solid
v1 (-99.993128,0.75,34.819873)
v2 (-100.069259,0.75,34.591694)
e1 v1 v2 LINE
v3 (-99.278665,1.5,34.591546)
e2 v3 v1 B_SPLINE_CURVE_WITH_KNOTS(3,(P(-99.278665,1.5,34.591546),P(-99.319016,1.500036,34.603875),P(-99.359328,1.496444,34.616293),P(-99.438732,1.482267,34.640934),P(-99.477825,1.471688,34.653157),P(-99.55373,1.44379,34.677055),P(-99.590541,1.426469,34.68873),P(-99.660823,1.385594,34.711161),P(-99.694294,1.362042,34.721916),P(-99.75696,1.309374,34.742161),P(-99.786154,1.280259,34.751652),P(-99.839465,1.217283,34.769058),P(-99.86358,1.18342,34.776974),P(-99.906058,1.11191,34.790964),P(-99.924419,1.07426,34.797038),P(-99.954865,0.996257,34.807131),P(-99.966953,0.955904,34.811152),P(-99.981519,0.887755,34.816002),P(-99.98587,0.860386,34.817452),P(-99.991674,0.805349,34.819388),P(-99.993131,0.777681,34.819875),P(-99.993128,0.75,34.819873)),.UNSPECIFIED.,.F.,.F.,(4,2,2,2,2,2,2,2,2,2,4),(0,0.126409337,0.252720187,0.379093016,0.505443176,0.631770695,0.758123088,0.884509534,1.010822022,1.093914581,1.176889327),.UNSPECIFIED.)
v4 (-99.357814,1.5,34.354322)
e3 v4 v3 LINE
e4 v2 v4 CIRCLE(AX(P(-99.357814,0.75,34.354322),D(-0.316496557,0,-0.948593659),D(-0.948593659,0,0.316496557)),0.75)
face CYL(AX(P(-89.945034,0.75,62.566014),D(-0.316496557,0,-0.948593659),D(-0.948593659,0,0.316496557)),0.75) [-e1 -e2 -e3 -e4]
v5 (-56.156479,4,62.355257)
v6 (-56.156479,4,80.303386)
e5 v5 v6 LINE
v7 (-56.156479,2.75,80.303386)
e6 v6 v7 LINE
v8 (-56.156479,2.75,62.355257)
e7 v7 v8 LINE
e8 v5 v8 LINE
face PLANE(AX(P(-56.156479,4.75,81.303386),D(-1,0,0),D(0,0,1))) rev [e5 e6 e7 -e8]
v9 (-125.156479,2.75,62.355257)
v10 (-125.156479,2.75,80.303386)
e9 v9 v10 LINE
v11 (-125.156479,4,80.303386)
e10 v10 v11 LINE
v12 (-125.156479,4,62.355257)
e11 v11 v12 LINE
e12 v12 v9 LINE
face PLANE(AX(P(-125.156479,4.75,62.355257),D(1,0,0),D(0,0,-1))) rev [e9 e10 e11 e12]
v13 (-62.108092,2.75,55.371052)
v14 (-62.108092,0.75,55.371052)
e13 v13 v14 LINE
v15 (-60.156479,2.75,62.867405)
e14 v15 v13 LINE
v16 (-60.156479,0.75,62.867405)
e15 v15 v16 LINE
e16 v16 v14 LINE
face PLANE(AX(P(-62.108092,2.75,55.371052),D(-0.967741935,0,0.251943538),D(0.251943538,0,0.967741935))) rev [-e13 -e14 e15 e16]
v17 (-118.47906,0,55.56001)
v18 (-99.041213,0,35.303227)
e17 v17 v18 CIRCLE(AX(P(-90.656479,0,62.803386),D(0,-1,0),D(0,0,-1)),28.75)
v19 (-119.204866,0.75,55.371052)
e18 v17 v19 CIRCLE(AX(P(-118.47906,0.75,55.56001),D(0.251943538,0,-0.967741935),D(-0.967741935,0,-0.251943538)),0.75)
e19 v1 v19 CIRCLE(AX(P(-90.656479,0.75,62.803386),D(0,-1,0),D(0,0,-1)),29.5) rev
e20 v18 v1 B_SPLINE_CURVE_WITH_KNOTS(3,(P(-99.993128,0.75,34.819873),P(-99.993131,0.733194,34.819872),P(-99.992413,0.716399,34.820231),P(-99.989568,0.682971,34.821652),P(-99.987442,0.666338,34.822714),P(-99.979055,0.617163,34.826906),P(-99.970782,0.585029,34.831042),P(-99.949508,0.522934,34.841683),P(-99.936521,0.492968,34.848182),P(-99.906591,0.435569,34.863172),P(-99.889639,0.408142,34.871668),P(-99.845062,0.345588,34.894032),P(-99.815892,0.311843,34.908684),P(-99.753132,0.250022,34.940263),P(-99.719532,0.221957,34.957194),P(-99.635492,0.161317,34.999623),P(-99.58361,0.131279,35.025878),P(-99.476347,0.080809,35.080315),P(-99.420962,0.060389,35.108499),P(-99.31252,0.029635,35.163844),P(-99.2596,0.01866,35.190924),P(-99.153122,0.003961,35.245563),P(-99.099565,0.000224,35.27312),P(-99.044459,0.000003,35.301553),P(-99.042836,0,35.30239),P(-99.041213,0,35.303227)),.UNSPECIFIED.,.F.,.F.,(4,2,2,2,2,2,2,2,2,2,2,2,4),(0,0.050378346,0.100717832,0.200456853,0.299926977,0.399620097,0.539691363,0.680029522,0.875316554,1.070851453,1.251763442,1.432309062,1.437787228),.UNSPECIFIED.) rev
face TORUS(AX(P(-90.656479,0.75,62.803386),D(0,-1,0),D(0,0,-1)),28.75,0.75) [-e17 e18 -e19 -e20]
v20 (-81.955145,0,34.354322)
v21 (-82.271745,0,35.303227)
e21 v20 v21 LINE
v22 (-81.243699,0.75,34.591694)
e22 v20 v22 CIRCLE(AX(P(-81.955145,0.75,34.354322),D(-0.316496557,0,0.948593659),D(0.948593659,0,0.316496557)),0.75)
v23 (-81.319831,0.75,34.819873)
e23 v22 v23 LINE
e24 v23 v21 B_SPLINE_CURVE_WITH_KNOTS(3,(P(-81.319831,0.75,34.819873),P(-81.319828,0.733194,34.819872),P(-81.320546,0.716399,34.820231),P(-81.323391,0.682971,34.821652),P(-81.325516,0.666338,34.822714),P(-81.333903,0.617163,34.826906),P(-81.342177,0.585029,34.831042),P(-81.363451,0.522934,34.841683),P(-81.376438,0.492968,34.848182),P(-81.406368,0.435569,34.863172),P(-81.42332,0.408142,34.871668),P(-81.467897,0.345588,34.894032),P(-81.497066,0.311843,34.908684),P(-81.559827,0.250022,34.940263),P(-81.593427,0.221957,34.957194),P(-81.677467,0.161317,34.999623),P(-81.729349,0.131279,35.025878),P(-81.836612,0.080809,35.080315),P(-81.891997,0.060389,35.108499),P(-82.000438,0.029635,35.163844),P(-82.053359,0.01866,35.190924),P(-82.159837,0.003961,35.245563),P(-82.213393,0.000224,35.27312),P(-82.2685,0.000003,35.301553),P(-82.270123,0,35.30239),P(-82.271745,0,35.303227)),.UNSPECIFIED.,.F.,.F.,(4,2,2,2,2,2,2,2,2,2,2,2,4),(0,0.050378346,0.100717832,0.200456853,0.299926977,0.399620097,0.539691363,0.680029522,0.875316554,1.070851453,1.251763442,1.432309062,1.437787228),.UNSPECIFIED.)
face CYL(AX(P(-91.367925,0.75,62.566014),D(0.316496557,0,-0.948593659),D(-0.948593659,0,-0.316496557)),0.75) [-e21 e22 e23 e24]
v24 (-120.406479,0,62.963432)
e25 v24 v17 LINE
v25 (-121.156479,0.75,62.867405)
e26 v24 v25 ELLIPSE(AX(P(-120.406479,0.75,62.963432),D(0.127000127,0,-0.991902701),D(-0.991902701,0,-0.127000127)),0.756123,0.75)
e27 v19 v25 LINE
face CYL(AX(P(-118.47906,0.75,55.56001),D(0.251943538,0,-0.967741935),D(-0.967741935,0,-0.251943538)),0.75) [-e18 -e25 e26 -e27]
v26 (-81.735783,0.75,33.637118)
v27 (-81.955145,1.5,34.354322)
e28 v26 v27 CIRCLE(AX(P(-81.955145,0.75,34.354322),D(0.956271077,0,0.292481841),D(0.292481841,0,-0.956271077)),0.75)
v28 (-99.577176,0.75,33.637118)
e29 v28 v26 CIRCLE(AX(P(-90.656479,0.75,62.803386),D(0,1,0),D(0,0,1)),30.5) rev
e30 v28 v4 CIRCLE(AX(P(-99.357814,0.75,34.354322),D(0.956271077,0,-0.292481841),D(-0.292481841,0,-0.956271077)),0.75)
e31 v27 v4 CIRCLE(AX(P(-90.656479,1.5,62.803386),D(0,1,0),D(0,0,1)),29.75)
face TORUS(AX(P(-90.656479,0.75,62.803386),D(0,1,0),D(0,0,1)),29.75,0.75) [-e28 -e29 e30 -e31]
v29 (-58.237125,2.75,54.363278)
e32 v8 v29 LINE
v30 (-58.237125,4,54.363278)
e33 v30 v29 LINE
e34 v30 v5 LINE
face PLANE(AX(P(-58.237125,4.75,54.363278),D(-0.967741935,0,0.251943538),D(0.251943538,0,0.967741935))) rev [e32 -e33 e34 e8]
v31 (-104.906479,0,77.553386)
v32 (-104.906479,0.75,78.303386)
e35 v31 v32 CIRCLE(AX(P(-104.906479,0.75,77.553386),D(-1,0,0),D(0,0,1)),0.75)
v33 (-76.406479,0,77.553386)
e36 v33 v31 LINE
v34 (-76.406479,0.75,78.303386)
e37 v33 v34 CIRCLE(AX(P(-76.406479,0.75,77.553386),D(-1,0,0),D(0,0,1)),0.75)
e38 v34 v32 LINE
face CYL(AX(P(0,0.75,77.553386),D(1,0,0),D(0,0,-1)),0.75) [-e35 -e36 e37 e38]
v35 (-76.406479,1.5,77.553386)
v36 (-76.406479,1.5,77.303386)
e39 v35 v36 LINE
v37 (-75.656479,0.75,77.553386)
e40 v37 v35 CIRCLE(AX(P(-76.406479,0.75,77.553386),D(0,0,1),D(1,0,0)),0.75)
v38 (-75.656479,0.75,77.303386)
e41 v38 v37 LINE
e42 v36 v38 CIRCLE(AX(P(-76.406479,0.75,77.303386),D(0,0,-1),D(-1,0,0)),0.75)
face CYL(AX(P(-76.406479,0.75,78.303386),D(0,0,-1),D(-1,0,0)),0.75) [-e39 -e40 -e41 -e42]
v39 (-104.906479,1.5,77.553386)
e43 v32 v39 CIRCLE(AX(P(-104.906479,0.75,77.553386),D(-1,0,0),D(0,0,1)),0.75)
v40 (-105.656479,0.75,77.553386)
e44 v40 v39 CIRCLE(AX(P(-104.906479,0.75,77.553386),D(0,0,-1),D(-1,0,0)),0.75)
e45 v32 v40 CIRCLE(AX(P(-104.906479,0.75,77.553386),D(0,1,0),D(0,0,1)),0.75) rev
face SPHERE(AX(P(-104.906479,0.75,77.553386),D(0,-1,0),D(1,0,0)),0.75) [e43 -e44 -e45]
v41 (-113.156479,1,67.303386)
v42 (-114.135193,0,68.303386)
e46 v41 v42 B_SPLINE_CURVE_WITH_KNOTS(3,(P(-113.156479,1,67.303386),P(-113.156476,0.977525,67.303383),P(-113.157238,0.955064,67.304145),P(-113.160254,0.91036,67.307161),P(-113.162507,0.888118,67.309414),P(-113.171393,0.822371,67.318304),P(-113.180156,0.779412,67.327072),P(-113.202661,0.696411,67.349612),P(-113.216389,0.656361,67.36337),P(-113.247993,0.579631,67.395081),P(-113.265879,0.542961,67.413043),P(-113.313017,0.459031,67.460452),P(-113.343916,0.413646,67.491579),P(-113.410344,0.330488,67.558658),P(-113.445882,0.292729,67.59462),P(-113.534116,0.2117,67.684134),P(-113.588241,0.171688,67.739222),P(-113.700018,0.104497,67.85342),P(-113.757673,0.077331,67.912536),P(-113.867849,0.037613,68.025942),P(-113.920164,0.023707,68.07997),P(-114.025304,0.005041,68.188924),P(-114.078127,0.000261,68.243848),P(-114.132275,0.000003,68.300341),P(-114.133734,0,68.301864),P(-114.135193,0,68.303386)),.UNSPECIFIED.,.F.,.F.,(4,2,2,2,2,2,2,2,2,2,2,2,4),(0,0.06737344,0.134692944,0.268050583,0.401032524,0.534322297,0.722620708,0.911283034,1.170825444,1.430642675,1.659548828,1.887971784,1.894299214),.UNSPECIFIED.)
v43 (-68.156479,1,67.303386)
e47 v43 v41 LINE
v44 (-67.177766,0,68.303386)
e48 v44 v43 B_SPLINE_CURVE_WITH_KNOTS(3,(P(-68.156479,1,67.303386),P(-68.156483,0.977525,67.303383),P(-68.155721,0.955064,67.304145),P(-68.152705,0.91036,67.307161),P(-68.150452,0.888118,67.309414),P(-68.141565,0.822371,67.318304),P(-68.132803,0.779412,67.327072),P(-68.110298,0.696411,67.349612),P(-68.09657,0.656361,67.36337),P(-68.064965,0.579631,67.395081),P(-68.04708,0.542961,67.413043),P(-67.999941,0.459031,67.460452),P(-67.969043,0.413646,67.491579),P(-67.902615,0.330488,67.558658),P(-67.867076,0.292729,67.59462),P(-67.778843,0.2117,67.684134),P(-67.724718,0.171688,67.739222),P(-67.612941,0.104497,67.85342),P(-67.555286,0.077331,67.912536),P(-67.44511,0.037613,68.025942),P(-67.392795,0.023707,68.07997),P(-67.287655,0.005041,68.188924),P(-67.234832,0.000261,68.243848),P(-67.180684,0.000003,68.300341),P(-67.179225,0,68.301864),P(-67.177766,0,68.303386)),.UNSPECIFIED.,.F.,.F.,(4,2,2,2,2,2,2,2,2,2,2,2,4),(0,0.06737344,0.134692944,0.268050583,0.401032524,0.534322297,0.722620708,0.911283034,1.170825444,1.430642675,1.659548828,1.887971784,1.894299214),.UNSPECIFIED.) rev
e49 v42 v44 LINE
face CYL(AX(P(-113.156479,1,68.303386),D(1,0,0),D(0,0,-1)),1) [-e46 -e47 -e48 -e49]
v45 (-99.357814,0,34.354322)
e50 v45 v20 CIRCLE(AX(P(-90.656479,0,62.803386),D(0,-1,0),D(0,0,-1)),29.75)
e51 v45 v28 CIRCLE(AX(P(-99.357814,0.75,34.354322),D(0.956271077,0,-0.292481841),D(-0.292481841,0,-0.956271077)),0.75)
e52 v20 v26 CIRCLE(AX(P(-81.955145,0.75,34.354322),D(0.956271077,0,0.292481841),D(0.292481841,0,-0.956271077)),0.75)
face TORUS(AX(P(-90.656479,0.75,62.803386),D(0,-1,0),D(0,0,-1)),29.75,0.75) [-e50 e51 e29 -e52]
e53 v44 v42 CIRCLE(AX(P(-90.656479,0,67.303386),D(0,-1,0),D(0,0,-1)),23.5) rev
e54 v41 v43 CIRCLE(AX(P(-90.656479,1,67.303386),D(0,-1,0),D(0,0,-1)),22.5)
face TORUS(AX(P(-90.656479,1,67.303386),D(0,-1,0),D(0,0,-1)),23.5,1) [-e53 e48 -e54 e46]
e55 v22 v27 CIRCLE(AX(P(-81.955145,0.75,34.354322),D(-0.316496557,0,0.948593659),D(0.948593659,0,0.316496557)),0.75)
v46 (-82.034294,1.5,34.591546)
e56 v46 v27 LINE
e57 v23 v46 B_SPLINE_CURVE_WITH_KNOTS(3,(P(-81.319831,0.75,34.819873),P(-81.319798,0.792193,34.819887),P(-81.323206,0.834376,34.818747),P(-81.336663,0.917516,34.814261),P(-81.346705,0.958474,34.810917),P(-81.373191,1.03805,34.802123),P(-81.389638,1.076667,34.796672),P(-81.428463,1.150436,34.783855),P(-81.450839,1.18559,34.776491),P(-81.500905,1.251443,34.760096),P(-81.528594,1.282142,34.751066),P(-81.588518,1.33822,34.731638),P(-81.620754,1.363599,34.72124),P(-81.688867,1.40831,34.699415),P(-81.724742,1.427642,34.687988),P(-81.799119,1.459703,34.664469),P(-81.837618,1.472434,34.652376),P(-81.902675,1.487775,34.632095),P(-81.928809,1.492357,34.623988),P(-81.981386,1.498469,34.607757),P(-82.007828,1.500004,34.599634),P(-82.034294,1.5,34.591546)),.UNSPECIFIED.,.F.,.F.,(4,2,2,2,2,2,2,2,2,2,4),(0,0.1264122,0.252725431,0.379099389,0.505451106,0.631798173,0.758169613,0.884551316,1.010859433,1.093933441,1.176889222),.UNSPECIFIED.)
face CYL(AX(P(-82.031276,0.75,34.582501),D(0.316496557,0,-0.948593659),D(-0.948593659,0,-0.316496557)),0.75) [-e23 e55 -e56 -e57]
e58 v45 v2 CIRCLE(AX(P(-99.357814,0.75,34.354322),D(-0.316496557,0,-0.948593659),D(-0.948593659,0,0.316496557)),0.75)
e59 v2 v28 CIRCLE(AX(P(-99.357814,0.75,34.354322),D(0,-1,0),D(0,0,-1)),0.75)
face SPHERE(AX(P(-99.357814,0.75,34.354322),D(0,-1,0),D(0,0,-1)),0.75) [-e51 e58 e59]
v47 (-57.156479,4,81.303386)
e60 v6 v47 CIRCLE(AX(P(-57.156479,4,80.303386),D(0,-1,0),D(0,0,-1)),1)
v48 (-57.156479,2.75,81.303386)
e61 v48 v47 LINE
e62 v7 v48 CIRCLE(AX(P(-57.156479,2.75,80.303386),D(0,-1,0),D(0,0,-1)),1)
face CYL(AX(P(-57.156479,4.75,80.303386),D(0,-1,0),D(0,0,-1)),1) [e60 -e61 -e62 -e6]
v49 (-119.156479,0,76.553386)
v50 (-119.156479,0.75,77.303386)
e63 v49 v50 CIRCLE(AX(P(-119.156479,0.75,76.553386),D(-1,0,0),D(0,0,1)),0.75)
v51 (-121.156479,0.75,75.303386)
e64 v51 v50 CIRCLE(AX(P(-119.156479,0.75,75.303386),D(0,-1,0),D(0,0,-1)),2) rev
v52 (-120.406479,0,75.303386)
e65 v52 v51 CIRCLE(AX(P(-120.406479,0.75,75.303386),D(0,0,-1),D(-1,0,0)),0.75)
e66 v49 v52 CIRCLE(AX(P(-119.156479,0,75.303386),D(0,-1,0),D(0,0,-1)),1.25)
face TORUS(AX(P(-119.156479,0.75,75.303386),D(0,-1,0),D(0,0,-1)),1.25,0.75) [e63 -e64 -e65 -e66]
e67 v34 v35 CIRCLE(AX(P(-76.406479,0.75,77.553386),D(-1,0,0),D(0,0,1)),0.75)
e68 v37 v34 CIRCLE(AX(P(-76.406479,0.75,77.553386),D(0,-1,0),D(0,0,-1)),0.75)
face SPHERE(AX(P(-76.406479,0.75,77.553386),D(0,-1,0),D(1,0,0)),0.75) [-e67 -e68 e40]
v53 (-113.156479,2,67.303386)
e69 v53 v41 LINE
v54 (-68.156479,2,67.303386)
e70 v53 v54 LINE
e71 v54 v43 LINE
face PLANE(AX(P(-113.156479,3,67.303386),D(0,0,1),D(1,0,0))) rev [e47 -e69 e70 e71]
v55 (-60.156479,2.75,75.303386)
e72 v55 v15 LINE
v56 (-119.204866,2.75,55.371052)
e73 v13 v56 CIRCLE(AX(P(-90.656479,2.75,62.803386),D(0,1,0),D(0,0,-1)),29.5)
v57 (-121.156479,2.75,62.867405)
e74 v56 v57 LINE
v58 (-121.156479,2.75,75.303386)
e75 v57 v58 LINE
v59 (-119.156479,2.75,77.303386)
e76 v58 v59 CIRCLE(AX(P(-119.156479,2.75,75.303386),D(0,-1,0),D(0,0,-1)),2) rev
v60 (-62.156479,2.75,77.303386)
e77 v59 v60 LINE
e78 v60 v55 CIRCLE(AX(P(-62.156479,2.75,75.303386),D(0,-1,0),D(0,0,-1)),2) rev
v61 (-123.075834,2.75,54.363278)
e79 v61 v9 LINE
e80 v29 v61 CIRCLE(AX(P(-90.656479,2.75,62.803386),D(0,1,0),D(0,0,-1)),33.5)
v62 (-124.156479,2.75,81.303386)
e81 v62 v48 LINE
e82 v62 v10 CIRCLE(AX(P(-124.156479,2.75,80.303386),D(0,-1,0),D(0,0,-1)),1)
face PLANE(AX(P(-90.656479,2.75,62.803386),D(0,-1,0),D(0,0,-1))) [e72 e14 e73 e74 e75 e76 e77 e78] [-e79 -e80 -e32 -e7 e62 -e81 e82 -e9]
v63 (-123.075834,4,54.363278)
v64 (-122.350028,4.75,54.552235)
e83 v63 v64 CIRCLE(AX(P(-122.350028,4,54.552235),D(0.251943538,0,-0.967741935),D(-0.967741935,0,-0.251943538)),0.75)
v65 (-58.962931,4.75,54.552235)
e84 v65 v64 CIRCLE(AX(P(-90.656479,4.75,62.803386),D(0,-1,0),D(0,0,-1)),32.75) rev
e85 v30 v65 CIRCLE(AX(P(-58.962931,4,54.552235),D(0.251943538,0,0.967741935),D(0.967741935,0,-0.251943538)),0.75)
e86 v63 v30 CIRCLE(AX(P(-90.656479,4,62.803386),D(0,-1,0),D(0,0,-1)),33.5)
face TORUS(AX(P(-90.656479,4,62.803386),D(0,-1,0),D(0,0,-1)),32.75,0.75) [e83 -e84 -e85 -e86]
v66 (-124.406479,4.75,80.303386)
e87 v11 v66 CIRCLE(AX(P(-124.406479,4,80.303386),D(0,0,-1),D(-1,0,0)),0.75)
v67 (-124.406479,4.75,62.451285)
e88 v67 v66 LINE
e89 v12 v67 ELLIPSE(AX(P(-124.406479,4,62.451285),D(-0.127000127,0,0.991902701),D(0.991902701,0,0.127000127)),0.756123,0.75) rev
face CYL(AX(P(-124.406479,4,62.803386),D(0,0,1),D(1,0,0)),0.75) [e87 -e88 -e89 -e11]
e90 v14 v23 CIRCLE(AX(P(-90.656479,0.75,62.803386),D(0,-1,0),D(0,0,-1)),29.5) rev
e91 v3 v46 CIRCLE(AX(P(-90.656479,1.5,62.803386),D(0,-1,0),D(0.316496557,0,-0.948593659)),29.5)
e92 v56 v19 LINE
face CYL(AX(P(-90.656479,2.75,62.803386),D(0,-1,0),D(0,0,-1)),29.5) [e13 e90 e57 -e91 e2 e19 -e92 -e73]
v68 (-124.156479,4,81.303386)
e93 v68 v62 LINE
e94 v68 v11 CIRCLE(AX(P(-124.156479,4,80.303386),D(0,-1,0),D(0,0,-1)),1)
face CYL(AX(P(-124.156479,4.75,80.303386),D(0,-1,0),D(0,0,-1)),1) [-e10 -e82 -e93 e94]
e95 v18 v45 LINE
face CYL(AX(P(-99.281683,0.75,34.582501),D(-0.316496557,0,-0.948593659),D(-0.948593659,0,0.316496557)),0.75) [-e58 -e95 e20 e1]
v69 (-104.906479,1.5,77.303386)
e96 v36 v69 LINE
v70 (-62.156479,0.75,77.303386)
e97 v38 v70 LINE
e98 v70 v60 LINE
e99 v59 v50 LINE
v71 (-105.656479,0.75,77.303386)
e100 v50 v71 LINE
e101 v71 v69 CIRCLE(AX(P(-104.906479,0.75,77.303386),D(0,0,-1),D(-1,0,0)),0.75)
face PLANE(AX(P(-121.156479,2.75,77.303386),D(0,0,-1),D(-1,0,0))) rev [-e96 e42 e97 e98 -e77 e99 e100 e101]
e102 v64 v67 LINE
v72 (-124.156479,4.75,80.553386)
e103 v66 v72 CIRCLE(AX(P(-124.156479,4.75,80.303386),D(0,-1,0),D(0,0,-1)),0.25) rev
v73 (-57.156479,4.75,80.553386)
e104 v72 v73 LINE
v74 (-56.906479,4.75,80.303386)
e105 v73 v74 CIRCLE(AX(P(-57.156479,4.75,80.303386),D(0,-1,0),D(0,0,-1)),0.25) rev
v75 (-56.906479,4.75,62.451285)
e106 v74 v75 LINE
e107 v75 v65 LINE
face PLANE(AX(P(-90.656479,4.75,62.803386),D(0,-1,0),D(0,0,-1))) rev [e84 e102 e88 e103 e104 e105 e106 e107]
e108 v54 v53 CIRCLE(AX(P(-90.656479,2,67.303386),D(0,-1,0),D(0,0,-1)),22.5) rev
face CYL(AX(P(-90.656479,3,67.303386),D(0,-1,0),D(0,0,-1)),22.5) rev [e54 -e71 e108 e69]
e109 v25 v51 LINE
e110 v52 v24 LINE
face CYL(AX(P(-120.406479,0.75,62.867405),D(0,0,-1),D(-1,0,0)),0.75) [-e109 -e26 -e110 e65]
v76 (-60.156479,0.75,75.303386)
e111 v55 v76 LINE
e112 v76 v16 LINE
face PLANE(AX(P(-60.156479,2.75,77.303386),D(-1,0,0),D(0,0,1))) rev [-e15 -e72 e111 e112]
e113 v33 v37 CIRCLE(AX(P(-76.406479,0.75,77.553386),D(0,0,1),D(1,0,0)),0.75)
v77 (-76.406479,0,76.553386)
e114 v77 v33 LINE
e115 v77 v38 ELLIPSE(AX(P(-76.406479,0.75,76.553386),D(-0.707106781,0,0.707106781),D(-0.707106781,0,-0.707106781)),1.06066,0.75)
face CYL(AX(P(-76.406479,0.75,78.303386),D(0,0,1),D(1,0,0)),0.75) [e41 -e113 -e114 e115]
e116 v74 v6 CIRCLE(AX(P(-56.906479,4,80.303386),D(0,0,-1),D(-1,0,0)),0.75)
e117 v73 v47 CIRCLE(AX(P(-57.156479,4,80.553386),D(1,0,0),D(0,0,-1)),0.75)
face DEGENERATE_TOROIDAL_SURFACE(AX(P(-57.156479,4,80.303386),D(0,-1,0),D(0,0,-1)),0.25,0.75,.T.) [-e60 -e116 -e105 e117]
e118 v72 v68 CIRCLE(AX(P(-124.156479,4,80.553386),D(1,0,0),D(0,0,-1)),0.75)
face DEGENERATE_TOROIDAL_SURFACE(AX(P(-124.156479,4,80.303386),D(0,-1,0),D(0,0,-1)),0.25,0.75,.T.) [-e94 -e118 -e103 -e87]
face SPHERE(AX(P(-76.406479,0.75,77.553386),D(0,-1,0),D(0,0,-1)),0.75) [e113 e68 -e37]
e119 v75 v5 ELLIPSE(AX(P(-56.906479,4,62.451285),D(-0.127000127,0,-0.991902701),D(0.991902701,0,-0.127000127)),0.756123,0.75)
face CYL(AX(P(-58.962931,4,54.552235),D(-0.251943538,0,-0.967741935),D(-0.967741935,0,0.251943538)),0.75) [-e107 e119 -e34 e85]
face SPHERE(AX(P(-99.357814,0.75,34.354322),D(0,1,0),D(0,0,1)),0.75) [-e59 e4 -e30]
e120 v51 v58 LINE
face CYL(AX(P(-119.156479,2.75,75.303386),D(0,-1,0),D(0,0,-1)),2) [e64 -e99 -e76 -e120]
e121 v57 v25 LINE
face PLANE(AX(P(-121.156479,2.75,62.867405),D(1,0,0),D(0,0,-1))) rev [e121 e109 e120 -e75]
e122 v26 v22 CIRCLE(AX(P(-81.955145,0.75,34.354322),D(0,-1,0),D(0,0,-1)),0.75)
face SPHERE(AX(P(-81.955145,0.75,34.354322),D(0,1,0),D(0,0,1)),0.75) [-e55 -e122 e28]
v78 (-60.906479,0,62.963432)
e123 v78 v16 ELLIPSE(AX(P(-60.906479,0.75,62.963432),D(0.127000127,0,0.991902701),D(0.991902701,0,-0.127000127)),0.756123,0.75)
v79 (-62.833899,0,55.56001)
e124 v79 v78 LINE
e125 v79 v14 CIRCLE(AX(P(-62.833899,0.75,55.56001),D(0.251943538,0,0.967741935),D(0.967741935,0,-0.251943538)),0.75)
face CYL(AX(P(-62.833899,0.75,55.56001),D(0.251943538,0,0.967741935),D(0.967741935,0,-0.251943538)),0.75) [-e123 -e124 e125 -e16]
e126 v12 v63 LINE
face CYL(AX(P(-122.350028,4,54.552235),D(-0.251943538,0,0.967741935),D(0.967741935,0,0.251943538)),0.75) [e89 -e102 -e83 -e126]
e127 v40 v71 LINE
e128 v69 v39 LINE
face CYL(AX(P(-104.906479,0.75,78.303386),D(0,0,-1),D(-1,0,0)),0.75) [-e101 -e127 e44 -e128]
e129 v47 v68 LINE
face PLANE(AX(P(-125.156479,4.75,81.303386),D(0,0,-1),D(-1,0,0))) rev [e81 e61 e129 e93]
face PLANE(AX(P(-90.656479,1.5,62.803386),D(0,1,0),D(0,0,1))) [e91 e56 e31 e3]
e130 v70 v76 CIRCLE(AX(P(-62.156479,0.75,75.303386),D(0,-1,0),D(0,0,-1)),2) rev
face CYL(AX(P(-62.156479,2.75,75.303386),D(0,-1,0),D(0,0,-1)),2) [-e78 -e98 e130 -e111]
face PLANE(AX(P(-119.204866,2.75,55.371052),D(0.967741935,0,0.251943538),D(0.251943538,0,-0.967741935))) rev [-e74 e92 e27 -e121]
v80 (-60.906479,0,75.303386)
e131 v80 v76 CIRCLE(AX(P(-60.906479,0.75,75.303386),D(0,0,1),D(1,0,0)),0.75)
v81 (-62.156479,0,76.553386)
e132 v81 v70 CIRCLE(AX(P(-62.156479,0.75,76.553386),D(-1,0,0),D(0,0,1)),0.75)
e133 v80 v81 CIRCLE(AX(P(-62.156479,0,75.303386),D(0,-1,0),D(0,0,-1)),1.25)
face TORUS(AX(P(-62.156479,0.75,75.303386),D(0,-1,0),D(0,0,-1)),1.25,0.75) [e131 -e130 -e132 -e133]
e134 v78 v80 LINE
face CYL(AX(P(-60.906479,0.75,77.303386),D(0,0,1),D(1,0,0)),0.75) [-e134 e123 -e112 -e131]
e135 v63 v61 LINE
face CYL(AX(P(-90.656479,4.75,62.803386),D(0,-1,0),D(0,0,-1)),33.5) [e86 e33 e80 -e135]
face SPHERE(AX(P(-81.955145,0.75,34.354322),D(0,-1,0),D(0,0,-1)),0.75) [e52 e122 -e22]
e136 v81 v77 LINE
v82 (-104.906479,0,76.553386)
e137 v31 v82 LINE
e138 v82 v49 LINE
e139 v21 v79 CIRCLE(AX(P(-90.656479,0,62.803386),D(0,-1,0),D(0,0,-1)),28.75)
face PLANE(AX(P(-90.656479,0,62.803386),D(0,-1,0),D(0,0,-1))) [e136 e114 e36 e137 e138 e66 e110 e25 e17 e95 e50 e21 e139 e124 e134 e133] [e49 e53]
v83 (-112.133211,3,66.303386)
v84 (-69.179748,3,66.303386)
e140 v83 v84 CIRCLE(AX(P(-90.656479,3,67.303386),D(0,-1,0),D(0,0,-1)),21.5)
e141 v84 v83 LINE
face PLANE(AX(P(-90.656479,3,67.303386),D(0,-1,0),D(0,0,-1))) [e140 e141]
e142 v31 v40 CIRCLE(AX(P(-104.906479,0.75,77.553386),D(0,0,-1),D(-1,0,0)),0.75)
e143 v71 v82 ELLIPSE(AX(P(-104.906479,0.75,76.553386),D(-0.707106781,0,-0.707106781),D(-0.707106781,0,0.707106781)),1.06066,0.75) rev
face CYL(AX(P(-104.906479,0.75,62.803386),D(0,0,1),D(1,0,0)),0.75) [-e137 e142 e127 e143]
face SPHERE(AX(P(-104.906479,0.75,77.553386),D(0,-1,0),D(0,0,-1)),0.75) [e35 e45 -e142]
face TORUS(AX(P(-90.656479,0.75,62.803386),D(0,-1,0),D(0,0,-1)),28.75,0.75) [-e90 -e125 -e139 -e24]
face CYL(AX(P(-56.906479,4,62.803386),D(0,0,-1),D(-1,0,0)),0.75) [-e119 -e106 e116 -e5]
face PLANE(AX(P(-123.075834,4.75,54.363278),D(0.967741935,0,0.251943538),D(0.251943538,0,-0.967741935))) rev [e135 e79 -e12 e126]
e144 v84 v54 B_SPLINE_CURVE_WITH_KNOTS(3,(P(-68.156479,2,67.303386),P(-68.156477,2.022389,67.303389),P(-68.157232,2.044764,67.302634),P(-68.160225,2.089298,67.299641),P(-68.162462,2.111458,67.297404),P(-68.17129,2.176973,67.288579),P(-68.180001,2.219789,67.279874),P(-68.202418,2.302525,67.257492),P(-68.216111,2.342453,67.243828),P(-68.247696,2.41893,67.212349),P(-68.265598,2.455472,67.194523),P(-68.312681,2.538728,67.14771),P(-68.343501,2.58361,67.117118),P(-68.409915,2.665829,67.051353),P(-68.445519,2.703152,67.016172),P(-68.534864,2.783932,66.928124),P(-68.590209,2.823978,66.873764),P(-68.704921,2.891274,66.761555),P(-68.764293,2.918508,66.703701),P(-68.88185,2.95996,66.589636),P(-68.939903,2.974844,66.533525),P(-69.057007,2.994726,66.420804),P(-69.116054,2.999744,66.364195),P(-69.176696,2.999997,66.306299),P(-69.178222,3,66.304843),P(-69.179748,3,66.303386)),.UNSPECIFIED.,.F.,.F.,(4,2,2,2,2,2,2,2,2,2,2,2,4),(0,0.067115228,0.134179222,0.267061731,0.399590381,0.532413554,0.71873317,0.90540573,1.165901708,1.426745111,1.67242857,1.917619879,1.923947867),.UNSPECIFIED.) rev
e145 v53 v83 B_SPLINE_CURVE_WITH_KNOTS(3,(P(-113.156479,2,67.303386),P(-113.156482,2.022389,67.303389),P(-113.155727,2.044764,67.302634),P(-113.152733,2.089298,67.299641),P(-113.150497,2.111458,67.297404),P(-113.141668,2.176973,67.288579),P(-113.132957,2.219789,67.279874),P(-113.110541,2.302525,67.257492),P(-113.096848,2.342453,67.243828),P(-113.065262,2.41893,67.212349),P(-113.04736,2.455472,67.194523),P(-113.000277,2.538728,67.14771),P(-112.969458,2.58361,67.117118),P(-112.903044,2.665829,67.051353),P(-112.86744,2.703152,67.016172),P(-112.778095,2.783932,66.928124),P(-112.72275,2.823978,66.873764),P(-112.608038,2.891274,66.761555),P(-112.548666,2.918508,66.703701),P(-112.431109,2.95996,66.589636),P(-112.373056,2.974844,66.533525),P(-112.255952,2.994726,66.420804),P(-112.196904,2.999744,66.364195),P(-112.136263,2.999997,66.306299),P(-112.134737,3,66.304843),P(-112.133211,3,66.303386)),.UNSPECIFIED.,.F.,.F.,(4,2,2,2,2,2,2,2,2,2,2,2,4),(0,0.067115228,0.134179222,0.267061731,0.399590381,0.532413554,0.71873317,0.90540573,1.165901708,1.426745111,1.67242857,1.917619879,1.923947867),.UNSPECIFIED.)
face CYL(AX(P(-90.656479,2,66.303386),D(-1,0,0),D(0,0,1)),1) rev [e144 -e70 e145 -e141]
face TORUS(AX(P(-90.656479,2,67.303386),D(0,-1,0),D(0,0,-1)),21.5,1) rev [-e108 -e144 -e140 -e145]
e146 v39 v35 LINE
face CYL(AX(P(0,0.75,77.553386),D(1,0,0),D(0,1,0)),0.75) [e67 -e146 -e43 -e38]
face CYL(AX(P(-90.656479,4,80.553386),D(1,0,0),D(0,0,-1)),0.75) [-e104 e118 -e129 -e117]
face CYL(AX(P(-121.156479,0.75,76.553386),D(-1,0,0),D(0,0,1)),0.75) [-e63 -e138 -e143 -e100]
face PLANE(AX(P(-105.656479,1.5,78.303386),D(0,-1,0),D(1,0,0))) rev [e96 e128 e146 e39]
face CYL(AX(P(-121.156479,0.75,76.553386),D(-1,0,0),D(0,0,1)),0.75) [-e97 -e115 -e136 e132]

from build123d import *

# Parameters (mm, degrees)
BOSS_EXTRUDE1_DEPTH = 2.75
SKETCH12_W          = 30
SKETCH12_H          = 1.5
BOSS_EXTRUDE4_DEPTH = 1
FILLET7_R           = 0.75
FILLET8_R           = 0.75
BOSS_EXTRUDE5_DEPTH = 2
WRAP4_SECTION_W     = 1
WRAP4_SECTION_H     = 1.5
WRAP4_ANGLE         = 36.902366466
FILLET12_R          = 1
FILLET14_R          = 2
FILLET19_R          = 0.75
FILLET20_R          = 0.75
FILLET21_R          = 0.75
CUT_EXTRUDE1_DEPTH  = 3
FILLET22_R          = 1
FILLET23_R          = 1
FILLET24_R          = 0.75


with BuildPart() as part:
    # Sketch2 → Boss-Extrude1 (new body)
    with BuildSketch(Plane(origin=(0, 0, 0), x_dir=(1, 0, 0), z_dir=(0, 1, 0))):
        with BuildLine():
            Line((-62.108092304, -55.371051932), (-60.156479401, -62.867404741))
            Line((-60.156479401, -62.867404741), (-60.156479401, -77.303386301))
            Line((-60.156479401, -77.303386301), (-121.156479401, -77.303386301))
            Line((-121.156479401, -77.303386301), (-121.156479401, -62.867404741))
            Line((-121.156479401, -62.867404741), (-119.204866498, -55.371051932))
            ThreePointArc((-119.204866498, -55.371051932), (-90.656479401, -33.303386301), (-62.108092304, -55.371051932))
        make_face()
    extrude(amount=BOSS_EXTRUDE1_DEPTH)

    # Sketch12 → Boss-Extrude4 (add)
    with BuildSketch(Plane.XY.offset(77.303386301)):
        with Locations((-90.656479401, 0.75)):
            Rectangle(SKETCH12_W, SKETCH12_H)
    extrude(amount=BOSS_EXTRUDE4_DEPTH)

    # Fillet7
    fillet7_edges = [part.edges().sort_by_distance(p)[0] for p in [
        (-75.656479401, 0.75, 78.303386301),
        (-105.656479401, 0.75, 78.303386301),
    ]]
    fillet(fillet7_edges, radius=FILLET7_R)

    # Fillet8
    fillet8_edges = [part.edges().sort_by_distance(p)[0] for p in [
        (-105.656479401, 0, 77.428386301),
        (-105.436809487, 0, 78.083716387),
        (-75.656479401, 0, 77.428386301),
        (-75.876149315, 0, 78.083716387),
        (-75.656479401, 1.5, 77.428386301),
        (-75.876149315, 1.5, 78.083716387),
        (-105.656479401, 1.5, 77.428386301),
        (-105.436809487, 1.5, 78.083716387),
        (-90.656479401, 0, 78.303386301),
        (-90.656479401, 1.5, 78.303386301),
    ]]
    fillet(fillet8_edges, radius=FILLET8_R - 0.0001)  # a hair under: the kernel refuses the full size

    # Sketch13 → Boss-Extrude5 (add)
    with BuildSketch(Plane(origin=(0, 2.75, 0), x_dir=(1, 0, 0), z_dir=(0, 1, 0))):
        with BuildLine():
            Line((-58.237124562, -54.36327778), (-56.156479401, -62.355257221))
            Line((-56.156479401, -62.355257221), (-56.156479401, -81.303386301))
            Line((-56.156479401, -81.303386301), (-125.156479401, -81.303386301))
            Line((-125.156479401, -81.303386301), (-125.156479401, -62.355257221))
            Line((-125.156479401, -62.355257221), (-123.075834239, -54.36327778))
            ThreePointArc((-123.075834239, -54.36327778), (-90.656479401, -29.303386301), (-58.237124562, -54.36327778))
        make_face()
    extrude(amount=BOSS_EXTRUDE5_DEPTH)

    # Wrap4 section (on wrap section) → Wrap4 (revolve)
    with BuildSketch(Plane(origin=(-90.656479401, 0, 62.803386301), x_dir=(-0.3164965569528064, 0, -0.9485936587585957), z_dir=(-0.9485936587585957, 0, 0.3164965569528064))):
        with Locations((30, -0.75)):
            Rectangle(WRAP4_SECTION_W, WRAP4_SECTION_H)
    revolve(axis=Axis((-90.656479401, 0, 62.803386301), (0, -1, 0)), revolution_arc=WRAP4_ANGLE)

    # Fillet12
    fillet12_edges = [part.edges().sort_by_distance(p)[0] for p in [
        (-125.156479401, 3.75, 81.303386301),
        (-56.156479401, 3.75, 81.303386301),
    ]]
    fillet(fillet12_edges, radius=FILLET12_R)

    # Fillet14
    fillet14_edges = [part.edges().sort_by_distance(p)[0] for p in [
        (-121.156479401, 1.375, 77.303386301),
        (-60.156479401, 1.375, 77.303386301),
    ]]
    fillet(fillet14_edges, radius=FILLET14_R)

    # Fillet19
    fillet19_edges = [part.edges().sort_by_distance(p)[0] for p in [
        (-100.309624388, 0.75, 33.871279709),
        (-81.003334414, 0.75, 33.871279709),
    ]]
    fillet(fillet19_edges, radius=FILLET19_R)

    # Fillet20
    fillet20_edges = [part.edges().sort_by_distance(p)[0] for p in [
        (-81.281765183, 0, 34.705783772),
        (-81.281765183, 1.5, 34.705783772),
        (-90.656479401, 1.5, 32.303386301),
        (-100.031193618, 1.5, 34.705783772),
        (-90.656479401, 0, 32.303386301),
        (-100.031193618, 0, 34.705783772),
        (-100.024450454, 1.5, 34.010670695),
        (-81.288508347, 1.5, 34.010670695),
        (-100.024450454, 0, 34.010670695),
        (-81.288508347, 0, 34.010670695),
    ]]
    fillet(fillet20_edges, radius=FILLET20_R - 0.0001)  # a hair under: the kernel refuses the full size

    # Fillet21
    fillet21_edges = [part.edges().sort_by_distance(p)[0] for p in [
        (-90.656479401, 4.75, 81.303386301),
        (-56.156479401, 4.75, 71.329321761),
        (-56.44937262, 4.75, 81.010493082),
        (-124.863586182, 4.75, 81.010493082),
        (-90.656479401, 4.75, 29.303386301),
        (-124.11615682, 4.75, 58.359267501),
        (-125.156479401, 4.75, 71.329321761),
        (-57.196801981, 4.75, 58.359267501),
    ]]
    fillet(fillet21_edges, radius=FILLET21_R)

    # Sketch16 → Cut-Extrude1 (cut)
    with BuildSketch(Plane.XZ):
        with BuildLine():
            Line((-113.156479401, 67.303386301), (-68.156479401, 67.303386301))
            ThreePointArc((-68.156479401, 67.303386301), (-90.656479401, 44.803386301), (-113.156479401, 67.303386301))
        make_face()
    extrude(amount=-CUT_EXTRUDE1_DEPTH, mode=Mode.SUBTRACT)

    # Fillet22
    fillet22_edges = [part.edges().sort_by_distance(p)[0] for p in [
        (-90.656479401, 3, 44.803386301),
        (-90.656479401, 3, 67.303386301),
    ]]
    fillet(fillet22_edges, radius=FILLET22_R)

    # Fillet23
    fillet23_edges = [part.edges().sort_by_distance(p)[0] for p in [
        (-90.656479401, 0, 44.803386301),
        (-90.656479401, 0, 67.303386301),
    ]]
    fillet(fillet23_edges, radius=FILLET23_R)

    # Fillet24
    fillet24_edges = [part.edges().sort_by_distance(p)[0] for p in [
        (-111.948762062, 0, 42.385533841),
        (-120.180672949, 0, 59.119228337),
        (-121.156479401, 0, 69.085395521),
        (-120.570692963, 0, 76.717599863),
        (-112.031529401, 0, 77.303386301),
        (-69.281429401, 0, 77.303386301),
        (-60.742265838, 0, 76.717599863),
        (-60.156479401, 0, 69.085395521),
        (-61.132285852, 0, 59.119228337),
        (-69.36419674, 0, 42.385533841),
    ]]
    fillet(fillet24_edges, radius=FILLET24_R - 0.0001)  # a hair under: the kernel refuses the full size


solid = part.part
